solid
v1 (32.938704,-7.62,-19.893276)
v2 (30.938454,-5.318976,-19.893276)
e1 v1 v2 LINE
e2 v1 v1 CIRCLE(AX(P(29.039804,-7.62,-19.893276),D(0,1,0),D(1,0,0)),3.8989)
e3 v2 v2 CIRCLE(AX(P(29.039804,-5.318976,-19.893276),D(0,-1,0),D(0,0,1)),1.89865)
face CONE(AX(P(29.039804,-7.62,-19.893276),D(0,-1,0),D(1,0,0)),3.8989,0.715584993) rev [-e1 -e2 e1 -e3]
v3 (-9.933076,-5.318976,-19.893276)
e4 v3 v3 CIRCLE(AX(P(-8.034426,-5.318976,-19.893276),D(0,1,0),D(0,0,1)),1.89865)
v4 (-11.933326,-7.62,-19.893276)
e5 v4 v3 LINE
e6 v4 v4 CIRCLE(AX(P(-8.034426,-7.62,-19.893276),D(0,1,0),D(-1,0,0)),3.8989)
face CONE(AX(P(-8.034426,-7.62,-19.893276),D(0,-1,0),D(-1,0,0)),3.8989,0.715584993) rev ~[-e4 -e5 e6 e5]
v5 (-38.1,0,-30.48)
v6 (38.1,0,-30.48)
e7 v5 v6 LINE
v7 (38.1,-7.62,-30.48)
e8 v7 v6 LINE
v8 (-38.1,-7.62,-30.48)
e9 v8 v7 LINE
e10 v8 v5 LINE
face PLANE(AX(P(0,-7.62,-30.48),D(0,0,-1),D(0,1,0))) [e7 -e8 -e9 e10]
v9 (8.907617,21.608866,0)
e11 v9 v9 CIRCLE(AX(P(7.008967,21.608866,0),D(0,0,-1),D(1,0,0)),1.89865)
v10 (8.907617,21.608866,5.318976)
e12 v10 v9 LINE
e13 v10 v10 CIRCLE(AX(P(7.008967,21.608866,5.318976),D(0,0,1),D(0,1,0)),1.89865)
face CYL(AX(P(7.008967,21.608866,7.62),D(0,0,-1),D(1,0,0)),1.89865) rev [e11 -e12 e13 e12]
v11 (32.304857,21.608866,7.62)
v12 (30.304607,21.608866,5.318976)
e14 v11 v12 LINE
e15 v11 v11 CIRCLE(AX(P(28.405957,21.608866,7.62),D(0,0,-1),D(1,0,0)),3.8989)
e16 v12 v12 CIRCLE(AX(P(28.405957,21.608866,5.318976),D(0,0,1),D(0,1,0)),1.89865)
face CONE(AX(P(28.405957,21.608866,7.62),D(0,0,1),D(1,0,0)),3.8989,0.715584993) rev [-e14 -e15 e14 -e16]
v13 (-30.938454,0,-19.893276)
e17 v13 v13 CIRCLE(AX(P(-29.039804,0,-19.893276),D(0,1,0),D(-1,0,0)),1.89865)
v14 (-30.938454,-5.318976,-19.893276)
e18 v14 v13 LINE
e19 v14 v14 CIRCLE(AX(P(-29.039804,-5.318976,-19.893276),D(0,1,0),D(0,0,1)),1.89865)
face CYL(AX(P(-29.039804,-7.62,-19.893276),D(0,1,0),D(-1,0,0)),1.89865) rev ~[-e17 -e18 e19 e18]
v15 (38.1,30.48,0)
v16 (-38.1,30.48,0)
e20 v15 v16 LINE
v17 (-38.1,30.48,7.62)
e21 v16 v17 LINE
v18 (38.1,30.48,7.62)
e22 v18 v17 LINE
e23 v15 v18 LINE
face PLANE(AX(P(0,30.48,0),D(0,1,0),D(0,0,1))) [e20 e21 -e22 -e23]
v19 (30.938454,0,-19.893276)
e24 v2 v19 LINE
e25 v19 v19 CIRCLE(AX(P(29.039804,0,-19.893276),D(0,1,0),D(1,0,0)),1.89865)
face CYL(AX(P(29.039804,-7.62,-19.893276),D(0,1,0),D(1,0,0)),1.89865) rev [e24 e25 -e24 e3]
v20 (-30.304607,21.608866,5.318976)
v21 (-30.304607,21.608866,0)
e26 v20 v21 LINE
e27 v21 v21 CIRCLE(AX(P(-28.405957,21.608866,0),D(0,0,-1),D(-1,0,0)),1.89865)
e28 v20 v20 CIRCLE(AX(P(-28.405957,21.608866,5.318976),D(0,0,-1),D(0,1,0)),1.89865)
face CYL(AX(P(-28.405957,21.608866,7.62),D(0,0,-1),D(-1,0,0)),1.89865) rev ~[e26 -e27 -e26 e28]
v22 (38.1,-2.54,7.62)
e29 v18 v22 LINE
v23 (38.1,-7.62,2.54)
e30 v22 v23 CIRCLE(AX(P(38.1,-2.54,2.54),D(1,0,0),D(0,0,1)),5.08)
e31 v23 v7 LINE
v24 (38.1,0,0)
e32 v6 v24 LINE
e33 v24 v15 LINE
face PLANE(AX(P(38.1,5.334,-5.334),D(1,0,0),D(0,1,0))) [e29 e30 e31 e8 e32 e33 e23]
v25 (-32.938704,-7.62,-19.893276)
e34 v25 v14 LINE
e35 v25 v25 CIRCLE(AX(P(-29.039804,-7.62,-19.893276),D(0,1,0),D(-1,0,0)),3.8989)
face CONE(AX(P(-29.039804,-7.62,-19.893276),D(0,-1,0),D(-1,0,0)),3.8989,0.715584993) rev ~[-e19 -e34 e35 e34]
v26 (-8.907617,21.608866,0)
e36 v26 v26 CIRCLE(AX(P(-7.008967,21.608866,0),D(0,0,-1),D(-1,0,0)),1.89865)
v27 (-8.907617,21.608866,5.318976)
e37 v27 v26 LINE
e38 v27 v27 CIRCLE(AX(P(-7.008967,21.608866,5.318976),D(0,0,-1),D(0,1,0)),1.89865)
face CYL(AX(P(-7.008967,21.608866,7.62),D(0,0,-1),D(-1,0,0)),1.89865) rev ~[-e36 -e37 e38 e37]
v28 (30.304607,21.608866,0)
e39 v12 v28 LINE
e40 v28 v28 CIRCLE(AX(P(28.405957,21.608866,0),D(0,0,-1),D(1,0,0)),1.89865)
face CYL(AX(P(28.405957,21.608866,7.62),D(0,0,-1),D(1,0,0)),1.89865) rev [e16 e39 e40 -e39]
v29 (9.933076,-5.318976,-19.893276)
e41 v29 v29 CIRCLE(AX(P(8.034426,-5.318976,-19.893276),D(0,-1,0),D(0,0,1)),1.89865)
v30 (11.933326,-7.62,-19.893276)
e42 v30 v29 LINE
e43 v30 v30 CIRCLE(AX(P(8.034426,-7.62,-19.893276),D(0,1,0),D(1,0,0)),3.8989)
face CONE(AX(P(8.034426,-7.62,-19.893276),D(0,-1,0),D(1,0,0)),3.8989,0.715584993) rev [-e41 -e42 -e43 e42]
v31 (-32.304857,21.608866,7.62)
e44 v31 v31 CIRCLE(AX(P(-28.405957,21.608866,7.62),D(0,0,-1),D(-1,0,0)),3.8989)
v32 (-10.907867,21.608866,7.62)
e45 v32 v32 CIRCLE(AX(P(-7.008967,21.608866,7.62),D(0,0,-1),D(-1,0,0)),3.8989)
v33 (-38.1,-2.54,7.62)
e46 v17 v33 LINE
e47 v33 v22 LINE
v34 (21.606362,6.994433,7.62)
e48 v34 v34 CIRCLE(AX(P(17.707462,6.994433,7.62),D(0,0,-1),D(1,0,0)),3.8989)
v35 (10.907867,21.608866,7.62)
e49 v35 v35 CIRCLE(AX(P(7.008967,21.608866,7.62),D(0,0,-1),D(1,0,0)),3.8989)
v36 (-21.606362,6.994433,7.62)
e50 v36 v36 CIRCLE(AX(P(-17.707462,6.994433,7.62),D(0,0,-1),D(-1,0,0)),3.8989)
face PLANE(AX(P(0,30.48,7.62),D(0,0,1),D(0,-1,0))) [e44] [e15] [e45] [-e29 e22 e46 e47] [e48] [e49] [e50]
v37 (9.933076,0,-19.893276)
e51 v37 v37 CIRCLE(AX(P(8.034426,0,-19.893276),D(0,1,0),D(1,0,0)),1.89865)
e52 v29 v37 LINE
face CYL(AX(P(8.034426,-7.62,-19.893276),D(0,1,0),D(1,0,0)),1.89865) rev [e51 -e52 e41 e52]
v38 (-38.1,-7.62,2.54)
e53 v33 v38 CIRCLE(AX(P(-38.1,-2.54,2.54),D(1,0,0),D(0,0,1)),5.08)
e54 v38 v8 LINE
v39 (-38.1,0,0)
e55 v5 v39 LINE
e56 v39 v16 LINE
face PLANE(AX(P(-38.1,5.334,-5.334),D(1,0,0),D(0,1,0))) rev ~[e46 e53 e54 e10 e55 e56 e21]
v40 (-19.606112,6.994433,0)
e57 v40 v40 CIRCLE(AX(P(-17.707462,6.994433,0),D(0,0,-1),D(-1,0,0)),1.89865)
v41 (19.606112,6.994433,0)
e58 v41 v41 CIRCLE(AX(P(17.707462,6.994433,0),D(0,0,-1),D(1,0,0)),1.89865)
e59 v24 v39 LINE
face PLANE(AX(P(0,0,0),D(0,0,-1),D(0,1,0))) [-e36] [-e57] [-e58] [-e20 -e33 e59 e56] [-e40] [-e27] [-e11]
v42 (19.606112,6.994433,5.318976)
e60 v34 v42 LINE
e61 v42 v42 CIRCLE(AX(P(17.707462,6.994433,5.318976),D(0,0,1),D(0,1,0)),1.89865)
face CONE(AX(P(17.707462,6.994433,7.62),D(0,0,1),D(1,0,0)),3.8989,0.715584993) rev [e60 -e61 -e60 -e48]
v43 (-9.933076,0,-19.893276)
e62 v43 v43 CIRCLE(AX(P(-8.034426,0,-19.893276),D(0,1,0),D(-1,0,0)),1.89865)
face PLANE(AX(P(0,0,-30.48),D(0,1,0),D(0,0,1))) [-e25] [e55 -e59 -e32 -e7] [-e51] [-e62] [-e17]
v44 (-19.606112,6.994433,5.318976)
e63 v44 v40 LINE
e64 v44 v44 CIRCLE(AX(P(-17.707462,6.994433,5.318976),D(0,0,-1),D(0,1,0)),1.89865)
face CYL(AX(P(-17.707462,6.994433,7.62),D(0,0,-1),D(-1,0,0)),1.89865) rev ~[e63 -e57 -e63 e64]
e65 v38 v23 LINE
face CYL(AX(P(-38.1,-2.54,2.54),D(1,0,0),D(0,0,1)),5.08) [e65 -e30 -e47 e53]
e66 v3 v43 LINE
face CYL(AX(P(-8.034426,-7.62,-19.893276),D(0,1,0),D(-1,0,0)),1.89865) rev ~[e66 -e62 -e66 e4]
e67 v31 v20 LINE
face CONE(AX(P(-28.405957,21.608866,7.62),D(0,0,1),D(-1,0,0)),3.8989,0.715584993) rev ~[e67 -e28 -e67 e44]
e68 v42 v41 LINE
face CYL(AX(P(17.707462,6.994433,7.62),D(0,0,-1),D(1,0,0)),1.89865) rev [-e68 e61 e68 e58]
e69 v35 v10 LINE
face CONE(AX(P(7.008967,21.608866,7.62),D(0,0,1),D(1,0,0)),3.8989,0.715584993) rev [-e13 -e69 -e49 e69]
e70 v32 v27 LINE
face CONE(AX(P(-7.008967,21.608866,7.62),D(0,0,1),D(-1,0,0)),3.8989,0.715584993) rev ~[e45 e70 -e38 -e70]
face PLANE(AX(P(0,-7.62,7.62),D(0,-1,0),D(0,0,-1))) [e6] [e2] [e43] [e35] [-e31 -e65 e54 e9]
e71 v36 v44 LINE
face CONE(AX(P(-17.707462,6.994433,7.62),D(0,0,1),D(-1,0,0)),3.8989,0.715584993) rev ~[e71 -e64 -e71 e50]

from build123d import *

# Parameters (mm, degrees)
F1_DEPTH       = 38.1
F3_D           = 3.7973
F3_CSINK_D     = 7.7978
F3_CSINK_ANGLE = 82
F4_R           = 5.08
F6_D           = 3.7973
F6_CSINK_D     = 7.7978
F6_CSINK_ANGLE = 82


# Not quite as in the source:
# - a pattern or mirror of a feature is missing from the dataset's text; its kind, count and spacing are read off the source's solid


with BuildPart() as f1:
    # F0 (on Right) → F1 (new body, symmetric)
    with BuildSketch(Plane.YZ):
        Polygon((30.48, 7.62), (-7.62, 7.62), (-7.62, -30.48), (0, -30.48), (0, 0), (30.48, 0), align=None)
    extrude(amount=F1_DEPTH, both=True)

    # F3 (through all)
    with Locations(Plane.XY.offset(7.62)):
        with Locations((-28.405956924, 21.6088658199), (-7.0089674555, 21.6088658199), (-17.7074621897, 6.9944329099)):
            f3 = CounterSinkHole(F3_D / 2, F3_CSINK_D / 2, counter_sink_angle=F3_CSINK_ANGLE)

    # F3_copies: F3 across plane
    add(f3.mirror(Plane(origin=(0, 0, 0), x_dir=(0, 0, 1), z_dir=(1, 0, 0))), mode=Mode.SUBTRACT)

    # F4
    f4_edges = [f1.edges().sort_by_distance(p)[0] for p in [
        (0, -7.62, 7.62),
    ]]
    fillet(f4_edges, radius=F4_R)

    # F6 (through all)
    with Locations(Plane.XZ.offset(7.62)):
        with Locations((-8.0344257876, -19.893276193), (-29.0398038924, -19.893276193)):
            f6 = CounterSinkHole(F6_D / 2, F6_CSINK_D / 2, counter_sink_angle=F6_CSINK_ANGLE)

    # F6_copies: F6 across plane
    add(f6.mirror(Plane(origin=(0, 0, 0), x_dir=(0, 0, 1), z_dir=(1, 0, 0))), mode=Mode.SUBTRACT)


solid = f1.part
